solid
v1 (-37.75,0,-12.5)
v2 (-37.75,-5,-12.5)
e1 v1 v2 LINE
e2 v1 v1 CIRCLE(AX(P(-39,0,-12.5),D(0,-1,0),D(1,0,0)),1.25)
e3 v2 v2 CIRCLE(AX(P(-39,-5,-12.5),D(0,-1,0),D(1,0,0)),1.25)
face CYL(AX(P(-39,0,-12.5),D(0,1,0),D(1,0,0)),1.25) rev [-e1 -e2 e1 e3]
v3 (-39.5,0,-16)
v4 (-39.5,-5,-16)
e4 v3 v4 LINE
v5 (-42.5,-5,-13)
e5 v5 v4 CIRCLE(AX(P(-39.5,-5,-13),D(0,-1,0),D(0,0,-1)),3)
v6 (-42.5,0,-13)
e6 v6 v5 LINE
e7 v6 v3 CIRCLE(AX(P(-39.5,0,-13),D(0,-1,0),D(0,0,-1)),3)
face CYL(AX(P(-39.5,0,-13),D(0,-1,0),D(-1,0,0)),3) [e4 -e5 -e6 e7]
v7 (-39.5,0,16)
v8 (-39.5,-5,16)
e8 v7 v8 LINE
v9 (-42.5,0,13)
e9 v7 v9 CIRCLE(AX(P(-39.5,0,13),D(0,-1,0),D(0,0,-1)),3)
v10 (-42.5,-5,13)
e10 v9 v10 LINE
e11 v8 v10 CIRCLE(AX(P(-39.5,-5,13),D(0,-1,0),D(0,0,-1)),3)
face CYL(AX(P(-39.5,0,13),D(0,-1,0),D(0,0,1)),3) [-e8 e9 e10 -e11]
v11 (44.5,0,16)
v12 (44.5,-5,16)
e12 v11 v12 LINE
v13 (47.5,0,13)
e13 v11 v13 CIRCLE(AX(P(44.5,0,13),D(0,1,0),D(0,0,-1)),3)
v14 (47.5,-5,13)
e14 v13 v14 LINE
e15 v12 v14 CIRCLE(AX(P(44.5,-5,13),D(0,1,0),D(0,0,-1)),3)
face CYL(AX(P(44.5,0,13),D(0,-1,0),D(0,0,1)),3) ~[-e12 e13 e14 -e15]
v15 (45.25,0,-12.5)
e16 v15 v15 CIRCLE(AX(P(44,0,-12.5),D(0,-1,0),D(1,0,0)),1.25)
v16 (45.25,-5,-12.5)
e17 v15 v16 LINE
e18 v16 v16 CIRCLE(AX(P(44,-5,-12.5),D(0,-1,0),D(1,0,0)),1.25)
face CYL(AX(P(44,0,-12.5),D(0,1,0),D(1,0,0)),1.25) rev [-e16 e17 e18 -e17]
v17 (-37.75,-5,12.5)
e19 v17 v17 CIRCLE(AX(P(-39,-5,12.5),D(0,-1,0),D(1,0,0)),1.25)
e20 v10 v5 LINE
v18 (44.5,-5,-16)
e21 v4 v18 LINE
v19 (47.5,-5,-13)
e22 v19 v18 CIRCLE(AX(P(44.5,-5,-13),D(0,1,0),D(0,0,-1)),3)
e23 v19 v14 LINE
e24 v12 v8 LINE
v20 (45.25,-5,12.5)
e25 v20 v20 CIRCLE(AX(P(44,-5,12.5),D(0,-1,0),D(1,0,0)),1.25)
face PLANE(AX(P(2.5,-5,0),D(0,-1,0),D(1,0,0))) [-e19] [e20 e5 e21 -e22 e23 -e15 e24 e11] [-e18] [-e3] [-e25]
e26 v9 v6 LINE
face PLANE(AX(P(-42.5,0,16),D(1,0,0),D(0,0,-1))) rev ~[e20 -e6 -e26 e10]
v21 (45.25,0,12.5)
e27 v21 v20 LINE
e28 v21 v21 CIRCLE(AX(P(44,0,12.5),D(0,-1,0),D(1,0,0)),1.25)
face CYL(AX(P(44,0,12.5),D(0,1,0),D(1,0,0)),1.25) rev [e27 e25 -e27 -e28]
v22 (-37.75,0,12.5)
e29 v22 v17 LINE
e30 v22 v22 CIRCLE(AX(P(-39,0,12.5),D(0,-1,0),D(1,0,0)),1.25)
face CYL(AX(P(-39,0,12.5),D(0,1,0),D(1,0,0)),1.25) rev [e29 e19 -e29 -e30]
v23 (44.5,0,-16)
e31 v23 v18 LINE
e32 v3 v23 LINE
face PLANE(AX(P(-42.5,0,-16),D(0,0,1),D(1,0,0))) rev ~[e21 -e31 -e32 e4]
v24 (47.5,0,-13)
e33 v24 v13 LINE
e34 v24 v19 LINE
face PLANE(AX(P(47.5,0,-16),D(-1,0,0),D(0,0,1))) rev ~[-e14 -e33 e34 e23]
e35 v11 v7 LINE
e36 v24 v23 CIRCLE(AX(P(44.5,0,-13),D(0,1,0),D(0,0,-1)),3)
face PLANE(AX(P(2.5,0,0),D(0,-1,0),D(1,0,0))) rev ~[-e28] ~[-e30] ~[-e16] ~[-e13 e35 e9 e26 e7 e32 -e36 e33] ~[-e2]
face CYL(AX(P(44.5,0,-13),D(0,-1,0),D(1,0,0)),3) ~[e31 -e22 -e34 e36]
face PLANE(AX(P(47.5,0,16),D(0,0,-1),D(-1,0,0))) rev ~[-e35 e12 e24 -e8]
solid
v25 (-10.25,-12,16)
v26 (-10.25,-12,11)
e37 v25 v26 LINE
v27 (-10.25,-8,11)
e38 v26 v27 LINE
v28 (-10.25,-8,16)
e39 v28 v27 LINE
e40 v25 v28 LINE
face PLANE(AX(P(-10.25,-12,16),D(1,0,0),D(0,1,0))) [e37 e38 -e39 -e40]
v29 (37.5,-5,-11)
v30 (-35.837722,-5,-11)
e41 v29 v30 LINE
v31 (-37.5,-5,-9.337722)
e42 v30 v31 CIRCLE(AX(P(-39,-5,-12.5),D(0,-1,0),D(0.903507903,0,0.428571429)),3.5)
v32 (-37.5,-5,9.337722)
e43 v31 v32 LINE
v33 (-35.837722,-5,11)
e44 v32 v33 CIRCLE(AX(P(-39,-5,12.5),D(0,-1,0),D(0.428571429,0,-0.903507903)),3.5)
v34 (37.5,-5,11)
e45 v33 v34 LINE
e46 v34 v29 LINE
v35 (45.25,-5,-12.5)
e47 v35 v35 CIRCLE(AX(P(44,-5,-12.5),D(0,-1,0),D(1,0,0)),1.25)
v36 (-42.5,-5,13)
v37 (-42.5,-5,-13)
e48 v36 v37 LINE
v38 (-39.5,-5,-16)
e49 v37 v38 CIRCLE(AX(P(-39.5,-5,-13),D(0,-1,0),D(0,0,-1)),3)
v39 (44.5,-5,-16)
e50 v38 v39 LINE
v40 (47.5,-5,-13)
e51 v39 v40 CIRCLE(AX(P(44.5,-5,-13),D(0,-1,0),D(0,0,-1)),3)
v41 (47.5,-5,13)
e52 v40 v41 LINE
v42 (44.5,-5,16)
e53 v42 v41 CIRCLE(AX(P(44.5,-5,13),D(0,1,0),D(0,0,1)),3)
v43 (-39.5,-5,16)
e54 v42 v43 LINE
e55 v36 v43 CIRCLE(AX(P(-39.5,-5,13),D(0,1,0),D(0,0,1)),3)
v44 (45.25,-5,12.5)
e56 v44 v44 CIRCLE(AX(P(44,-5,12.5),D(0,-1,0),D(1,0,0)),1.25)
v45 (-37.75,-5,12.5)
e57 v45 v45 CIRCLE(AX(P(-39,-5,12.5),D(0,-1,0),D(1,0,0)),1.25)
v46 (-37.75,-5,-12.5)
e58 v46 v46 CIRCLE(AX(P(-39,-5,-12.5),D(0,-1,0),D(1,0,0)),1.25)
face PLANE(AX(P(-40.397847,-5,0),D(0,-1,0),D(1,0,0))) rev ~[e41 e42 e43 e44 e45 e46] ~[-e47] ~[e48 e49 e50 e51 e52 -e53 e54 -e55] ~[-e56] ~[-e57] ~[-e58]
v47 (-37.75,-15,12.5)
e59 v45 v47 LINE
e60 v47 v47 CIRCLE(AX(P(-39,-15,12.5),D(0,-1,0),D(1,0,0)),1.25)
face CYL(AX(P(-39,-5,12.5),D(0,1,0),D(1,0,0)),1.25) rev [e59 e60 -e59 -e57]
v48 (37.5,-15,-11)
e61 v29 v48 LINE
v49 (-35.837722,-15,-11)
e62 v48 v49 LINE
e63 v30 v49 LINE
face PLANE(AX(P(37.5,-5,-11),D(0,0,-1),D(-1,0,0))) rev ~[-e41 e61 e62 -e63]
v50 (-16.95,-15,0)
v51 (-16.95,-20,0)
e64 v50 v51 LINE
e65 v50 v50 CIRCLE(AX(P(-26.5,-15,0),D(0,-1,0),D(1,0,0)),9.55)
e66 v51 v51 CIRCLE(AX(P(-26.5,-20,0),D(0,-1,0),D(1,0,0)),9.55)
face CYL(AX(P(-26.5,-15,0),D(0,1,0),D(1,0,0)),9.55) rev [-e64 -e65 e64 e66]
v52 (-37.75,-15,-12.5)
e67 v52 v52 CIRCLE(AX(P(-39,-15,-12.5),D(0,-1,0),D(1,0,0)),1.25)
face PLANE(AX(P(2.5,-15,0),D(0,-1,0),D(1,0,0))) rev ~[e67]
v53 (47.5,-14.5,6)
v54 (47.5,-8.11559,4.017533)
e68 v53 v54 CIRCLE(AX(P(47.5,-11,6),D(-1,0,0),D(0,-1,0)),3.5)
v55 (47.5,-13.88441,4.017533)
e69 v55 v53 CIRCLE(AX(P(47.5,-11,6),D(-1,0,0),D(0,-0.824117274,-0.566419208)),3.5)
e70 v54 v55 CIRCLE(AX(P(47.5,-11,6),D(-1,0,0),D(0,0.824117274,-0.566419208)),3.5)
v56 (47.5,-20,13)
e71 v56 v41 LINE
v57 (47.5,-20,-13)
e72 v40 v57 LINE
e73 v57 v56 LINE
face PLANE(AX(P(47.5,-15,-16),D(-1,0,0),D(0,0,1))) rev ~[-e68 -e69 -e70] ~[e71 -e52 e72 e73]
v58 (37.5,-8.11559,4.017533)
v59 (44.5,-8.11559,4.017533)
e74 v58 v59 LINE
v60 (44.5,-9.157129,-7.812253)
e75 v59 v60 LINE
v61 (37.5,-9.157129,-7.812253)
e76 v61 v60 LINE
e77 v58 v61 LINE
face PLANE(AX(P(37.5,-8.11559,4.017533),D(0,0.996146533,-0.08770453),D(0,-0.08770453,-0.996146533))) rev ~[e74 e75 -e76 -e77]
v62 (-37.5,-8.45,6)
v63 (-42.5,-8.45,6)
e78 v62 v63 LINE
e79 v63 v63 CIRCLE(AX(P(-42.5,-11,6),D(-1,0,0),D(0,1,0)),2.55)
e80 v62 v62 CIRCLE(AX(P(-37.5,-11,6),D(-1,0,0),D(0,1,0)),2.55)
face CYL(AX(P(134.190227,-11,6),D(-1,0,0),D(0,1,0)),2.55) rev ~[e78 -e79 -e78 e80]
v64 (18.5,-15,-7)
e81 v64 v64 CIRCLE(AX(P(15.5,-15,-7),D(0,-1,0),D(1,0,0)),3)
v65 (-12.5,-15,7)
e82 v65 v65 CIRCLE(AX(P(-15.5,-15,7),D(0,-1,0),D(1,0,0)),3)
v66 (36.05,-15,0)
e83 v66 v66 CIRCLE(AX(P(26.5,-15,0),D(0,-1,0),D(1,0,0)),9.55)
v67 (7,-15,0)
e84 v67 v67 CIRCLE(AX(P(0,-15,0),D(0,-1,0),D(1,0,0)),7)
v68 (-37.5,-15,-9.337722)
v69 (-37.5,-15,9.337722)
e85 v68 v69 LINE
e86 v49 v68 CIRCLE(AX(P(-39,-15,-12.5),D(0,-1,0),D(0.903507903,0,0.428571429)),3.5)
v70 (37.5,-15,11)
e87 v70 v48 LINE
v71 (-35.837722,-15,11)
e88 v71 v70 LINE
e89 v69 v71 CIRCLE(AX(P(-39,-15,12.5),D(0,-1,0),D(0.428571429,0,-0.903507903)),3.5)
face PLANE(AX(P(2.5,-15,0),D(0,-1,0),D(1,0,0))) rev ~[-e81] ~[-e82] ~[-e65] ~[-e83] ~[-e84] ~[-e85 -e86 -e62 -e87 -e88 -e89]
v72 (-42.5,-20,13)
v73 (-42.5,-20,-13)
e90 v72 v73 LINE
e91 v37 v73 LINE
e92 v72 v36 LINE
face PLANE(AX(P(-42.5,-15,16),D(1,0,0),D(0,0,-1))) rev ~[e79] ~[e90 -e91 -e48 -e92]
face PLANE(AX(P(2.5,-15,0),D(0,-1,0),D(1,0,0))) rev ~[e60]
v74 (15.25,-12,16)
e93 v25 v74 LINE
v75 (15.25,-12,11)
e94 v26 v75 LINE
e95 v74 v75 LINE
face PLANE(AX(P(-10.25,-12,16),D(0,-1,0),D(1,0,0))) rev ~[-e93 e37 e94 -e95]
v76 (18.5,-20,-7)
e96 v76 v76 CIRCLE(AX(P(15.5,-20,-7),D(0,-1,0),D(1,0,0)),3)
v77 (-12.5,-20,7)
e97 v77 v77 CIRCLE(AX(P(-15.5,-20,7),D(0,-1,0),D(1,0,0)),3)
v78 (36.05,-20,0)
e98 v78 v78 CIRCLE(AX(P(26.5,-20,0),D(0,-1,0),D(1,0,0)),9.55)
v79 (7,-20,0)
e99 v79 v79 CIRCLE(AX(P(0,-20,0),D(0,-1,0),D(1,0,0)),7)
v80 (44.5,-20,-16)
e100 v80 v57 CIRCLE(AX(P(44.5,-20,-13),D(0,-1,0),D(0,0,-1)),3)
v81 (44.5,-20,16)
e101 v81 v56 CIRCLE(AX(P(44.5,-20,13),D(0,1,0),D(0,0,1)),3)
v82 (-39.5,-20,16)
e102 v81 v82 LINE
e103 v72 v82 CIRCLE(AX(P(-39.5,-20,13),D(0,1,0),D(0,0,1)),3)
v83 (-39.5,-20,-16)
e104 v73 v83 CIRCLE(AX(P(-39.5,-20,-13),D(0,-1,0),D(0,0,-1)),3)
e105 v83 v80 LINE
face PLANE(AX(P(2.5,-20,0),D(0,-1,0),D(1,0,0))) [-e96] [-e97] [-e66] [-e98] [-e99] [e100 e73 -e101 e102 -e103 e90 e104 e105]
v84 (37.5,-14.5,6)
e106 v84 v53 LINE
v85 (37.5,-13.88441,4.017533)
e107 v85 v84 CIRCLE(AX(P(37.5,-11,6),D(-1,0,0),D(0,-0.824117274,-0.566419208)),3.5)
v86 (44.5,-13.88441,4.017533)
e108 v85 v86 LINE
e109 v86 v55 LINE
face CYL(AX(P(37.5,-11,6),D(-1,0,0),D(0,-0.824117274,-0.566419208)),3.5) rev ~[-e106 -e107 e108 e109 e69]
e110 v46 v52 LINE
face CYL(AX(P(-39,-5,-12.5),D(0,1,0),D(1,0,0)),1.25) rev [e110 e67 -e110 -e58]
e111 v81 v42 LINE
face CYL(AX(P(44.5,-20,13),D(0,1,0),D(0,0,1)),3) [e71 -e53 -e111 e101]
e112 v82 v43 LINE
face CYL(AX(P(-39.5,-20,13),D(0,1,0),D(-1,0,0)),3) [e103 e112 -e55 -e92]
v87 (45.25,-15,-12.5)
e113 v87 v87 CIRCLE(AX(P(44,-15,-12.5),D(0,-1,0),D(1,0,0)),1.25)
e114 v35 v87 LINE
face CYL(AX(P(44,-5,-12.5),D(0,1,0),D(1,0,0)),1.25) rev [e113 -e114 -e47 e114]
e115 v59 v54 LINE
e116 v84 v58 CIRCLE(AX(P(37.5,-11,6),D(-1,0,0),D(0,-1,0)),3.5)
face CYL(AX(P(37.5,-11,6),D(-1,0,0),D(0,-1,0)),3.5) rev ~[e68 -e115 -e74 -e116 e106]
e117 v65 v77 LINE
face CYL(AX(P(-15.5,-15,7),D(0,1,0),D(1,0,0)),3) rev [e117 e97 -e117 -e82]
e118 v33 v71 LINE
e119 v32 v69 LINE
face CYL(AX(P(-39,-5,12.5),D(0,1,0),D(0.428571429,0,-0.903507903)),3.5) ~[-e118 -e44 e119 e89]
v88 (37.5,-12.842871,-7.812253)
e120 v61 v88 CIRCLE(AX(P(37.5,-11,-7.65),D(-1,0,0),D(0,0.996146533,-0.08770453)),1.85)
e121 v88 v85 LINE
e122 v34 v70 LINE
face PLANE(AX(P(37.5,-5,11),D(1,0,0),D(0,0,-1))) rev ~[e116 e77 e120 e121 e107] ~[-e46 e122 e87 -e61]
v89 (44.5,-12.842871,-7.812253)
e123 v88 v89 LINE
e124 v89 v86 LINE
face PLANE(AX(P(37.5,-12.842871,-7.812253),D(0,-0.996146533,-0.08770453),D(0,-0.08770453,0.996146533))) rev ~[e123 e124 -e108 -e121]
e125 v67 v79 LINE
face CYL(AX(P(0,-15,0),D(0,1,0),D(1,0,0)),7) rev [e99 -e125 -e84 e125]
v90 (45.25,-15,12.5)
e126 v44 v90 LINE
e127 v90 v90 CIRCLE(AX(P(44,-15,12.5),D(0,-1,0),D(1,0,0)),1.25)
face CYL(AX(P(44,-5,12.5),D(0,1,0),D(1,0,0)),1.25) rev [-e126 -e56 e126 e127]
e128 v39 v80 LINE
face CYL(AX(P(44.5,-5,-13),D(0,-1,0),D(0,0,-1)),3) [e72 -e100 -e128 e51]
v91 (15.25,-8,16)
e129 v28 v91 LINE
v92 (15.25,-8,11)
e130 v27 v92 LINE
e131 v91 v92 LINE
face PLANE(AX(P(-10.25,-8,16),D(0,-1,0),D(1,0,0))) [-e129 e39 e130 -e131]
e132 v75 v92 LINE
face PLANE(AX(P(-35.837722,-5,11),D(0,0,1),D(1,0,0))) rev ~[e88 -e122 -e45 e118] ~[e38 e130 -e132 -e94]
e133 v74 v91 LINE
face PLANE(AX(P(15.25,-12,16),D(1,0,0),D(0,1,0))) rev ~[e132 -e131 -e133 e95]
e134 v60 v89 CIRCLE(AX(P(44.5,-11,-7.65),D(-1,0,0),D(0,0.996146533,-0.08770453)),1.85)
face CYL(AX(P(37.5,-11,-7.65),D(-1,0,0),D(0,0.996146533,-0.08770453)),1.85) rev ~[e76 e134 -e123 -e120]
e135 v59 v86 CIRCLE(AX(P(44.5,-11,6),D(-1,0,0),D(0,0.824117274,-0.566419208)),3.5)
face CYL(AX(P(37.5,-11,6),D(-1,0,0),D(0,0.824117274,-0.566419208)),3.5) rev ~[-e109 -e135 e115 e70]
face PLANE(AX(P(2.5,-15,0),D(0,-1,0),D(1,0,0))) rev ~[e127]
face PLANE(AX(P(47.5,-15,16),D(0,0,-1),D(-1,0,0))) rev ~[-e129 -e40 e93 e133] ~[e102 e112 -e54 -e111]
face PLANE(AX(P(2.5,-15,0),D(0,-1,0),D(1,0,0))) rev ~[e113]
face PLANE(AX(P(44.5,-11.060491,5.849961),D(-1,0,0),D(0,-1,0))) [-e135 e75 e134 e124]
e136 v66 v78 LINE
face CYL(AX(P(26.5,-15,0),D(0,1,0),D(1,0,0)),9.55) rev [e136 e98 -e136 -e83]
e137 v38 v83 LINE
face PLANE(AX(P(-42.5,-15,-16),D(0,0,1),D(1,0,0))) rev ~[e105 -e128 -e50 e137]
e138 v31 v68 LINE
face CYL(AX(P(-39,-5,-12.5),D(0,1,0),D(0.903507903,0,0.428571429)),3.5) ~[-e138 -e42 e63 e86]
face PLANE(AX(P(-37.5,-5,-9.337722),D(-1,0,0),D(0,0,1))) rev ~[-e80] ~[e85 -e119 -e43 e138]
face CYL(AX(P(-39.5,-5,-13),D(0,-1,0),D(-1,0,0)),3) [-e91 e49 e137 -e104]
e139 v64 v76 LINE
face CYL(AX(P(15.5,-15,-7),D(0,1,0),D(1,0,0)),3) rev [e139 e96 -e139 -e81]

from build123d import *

# Parameters (mm, degrees)
F0_R      = 1.25
F1_DEPTH  = 5
F2_R      = 1.25
F3_DEPTH  = 10
F4_R      = 3
F4_R_2    = 9.55
F4_R_3    = 7
F5_DEPTH  = 5
F6_W      = 25.5
F6_H      = 4
F7_DEPTH  = 5
F8_R      = 3
F8_2_R    = 3
F10_DEPTH = 10
F11_DEPTH = 7
F12_D     = 5.1


# Not quite as in the source:
# - a feature names something its author has since deleted; it is built from what else it names


with BuildPart() as f1:
    # F0 (on Front) → F1 (new body)
    with BuildSketch(Plane.XZ):
        Polygon((47.5, 16), (42.5, 16), (-42.5, 16), (-42.5, -16), (42.5, -16), (47.5, -16), align=None)
        with Locations((-39, -12.5)):
            Circle(F0_R, mode=Mode.SUBTRACT)
        with Locations((44, -12.5)):
            Circle(F0_R, mode=Mode.SUBTRACT)
        with Locations((-39, 12.5)):
            Circle(F0_R, mode=Mode.SUBTRACT)
        with Locations((44, 12.5)):
            Circle(F0_R, mode=Mode.SUBTRACT)
    extrude(amount=F1_DEPTH)

    # F8#2
    f8_2_edges = [f1.edges().sort_by_distance(p)[0] for p in [
        (47.5, -2.5, 16),
        (47.5, -2.5, -16),
        (-42.5, -2.5, 16),
        (-42.5, -2.5, -16),
    ]]
    fillet(f8_2_edges, radius=F8_2_R)


with BuildPart() as f3:
    # F2 (on face) → F3 (new body)
    with BuildSketch(Plane.XZ.offset(5)):
        with BuildLine():
            ThreePointArc((-37.5, 9.3377223398), (-40.8708286934, 9.5419601085), (-42.5, 12.5))
            Line((-42.5, 12.5), (-42.5, -12.5))
            ThreePointArc((-42.5, -12.5), (-40.8708286934, -9.5419601085), (-37.5, -9.3377223398))
            Line((-37.5, -9.3377223398), (-37.5, 9.3377223398))
        make_face()
        with BuildLine():
            ThreePointArc((-35.5, 12.5), (-36.5251262658, 14.9748737342), (-39, 16))
            ThreePointArc((-39, 16), (-41.4748737342, 14.9748737342), (-42.5, 12.5))
            ThreePointArc((-42.5, 12.5), (-40.8708286934, 9.5419601085), (-37.5, 9.3377223398))
            Line((-37.5, 9.3377223398), (-37.5, 11))
            Line((-37.5, 11), (-35.8377223398, 11))
            ThreePointArc((-35.8377223398, 11), (-35.5854742781, 11.7312255892), (-35.5, 12.5))
        make_face()
        with Locations((-39, 12.5)):
            Circle(F2_R, mode=Mode.SUBTRACT)
        with BuildLine():
            Line((-39, 16), (-42.5, 16))
            Line((-42.5, 16), (-42.5, 12.5))
            ThreePointArc((-42.5, 12.5), (-41.4748737342, 14.9748737342), (-39, 16))
        make_face()
        with BuildLine():
            ThreePointArc((-39, -16), (-41.4748737342, -14.9748737342), (-42.5, -12.5))
            Line((-42.5, -12.5), (-42.5, -16))
            Line((-42.5, -16), (-39, -16))
        make_face()
        with BuildLine():
            ThreePointArc((-37.5, -9.3377223398), (-40.8708286934, -9.5419601085), (-42.5, -12.5))
            ThreePointArc((-42.5, -12.5), (-41.4748737342, -14.9748737342), (-39, -16))
            ThreePointArc((-39, -16), (-36.5251262658, -14.9748737342), (-35.5, -12.5))
            ThreePointArc((-35.5, -12.5), (-35.5854742781, -11.7312255892), (-35.8377223398, -11))
            Line((-35.8377223398, -11), (-37.5, -11))
            Line((-37.5, -11), (-37.5, -9.3377223398))
        make_face()
        with Locations((-39, -12.5)):
            Circle(F2_R, mode=Mode.SUBTRACT)
        with BuildLine():
            Line((42.5, 16), (-39, 16))
            ThreePointArc((-39, 16), (-36.5251262658, 14.9748737342), (-35.5, 12.5))
            ThreePointArc((-35.5, 12.5), (-35.5854742781, 11.7312255892), (-35.8377223398, 11))
            Line((-35.8377223398, 11), (37.5, 11))
            Line((37.5, 11), (37.5, -11))
            Line((37.5, -11), (-35.8377223398, -11))
            ThreePointArc((-35.8377223398, -11), (-35.5854742781, -11.7312255892), (-35.5, -12.5))
            ThreePointArc((-35.5, -12.5), (-36.5251262658, -14.9748737342), (-39, -16))
            Line((-39, -16), (42.5, -16))
            Line((42.5, -16), (47.5, -16))
            Line((47.5, -16), (47.5, 16))
            Line((47.5, 16), (42.5, 16))
        make_face()
        with Locations((44, -12.5)):
            Circle(F2_R, mode=Mode.SUBTRACT)
        with Locations((44, 12.5)):
            Circle(F2_R, mode=Mode.SUBTRACT)
        with BuildLine():
            Line((-37.5, 11), (-37.5, 9.3377223398))
            ThreePointArc((-37.5, 9.3377223398), (-36.5251262658, 10.0251262658), (-35.8377223398, 11))
            Line((-35.8377223398, 11), (-37.5, 11))
        make_face()
        with BuildLine():
            ThreePointArc((-35.8377223398, -11), (-36.5251262658, -10.0251262658), (-37.5, -9.3377223398))
            Line((-37.5, -9.3377223398), (-37.5, -11))
            Line((-37.5, -11), (-35.8377223398, -11))
        make_face()
    extrude(amount=F3_DEPTH)

    # F4 (on face) → F5 (join)
    with BuildSketch(Plane.XZ.offset(15)):
        Polygon((42.5, 16), (-42.5, 16), (-42.5, -16), (42.5, -16), (47.5, -16), (47.5, 16), align=None)
        with Locations((15.5, -7)):
            Circle(F4_R, mode=Mode.SUBTRACT)
        with Locations((-26.5, 0)):
            Circle(F4_R_2, mode=Mode.SUBTRACT)
        Circle(F4_R_3, mode=Mode.SUBTRACT)
        with Locations((-15.5, 7)):
            Circle(F4_R, mode=Mode.SUBTRACT)
        with Locations((26.5, 0)):
            Circle(F4_R_2, mode=Mode.SUBTRACT)
    extrude(amount=F5_DEPTH)

    # F6 (on face) → F7 (cut)
    with BuildSketch(Plane.XY.offset(16)):
        with Locations((2.5, -10)):
            Rectangle(F6_W, F6_H)
    extrude(amount=-F7_DEPTH, mode=Mode.SUBTRACT)

    # F8
    f8_edges = [f3.edges().sort_by_distance(p)[0] for p in [
        (47.5, -12.5, 16),
        (47.5, -12.5, -16),
        (-42.5, -12.5, 16),
        (-42.5, -12.5, -16),
    ]]
    fillet(f8_edges, radius=F8_R)

    # F9 (on face) → F10 (cut, through all)
    with BuildSketch(Plane(origin=(37.5, 0, 0), x_dir=(0, -1, 0), z_dir=(-1, 0, 0))):
        with BuildLine():
            ThreePointArc((13.8844104576, 4.0175327715), (14.3425616376, 4.9620781825), (14.5, 6))
            ThreePointArc((14.5, 6), (9.9620781825, 9.3425616376), (8.1155895424, 4.0175327715))
            ThreePointArc((8.1155895424, 4.0175327715), (11, 2.5), (13.8844104576, 4.0175327715))
        make_face()
    extrude(amount=-F10_DEPTH, mode=Mode.SUBTRACT)

    # F9 (on face) → F11 (cut)
    with BuildSketch(Plane(origin=(37.5, 0, 0), x_dir=(0, -1, 0), z_dir=(-1, 0, 0))):
        with BuildLine():
            ThreePointArc((13.8844104576, 4.0175327715), (14.3425616376, 4.9620781825), (14.5, 6))
            ThreePointArc((14.5, 6), (9.9620781825, 9.3425616376), (8.1155895424, 4.0175327715))
            ThreePointArc((8.1155895424, 4.0175327715), (11, 2.5), (13.8844104576, 4.0175327715))
        make_face()
        with BuildLine():
            ThreePointArc((13.8844104576, 4.0175327715), (11, 2.5), (8.1155895424, 4.0175327715))
            Line((8.1155895424, 4.0175327715), (9.1571289137, -7.8122533804))
            ThreePointArc((9.1571289137, -7.8122533804), (10.9187950419, -5.8017830877), (12.85, -7.65))
            ThreePointArc((12.85, -7.65), (12.8482169123, -7.7312049581), (12.8428710863, -7.8122533804))
            Line((12.8428710863, -7.8122533804), (13.8844104576, 4.0175327715))
        make_face()
        with BuildLine():
            Line((12.8428710863, -7.8122533804), (9.1571289137, -7.8122533804))
            ThreePointArc((9.1571289137, -7.8122533804), (11, -9.5), (12.8428710863, -7.8122533804))
        make_face()
        with BuildLine():
            ThreePointArc((12.85, -7.65), (10.9187950419, -5.8017830877), (9.1571289137, -7.8122533804))
            Line((9.1571289137, -7.8122533804), (12.8428710863, -7.8122533804))
            ThreePointArc((12.8428710863, -7.8122533804), (12.8482169123, -7.7312049581), (12.85, -7.65))
        make_face()
    extrude(amount=-F11_DEPTH, mode=Mode.SUBTRACT)

    # F12 (through all)
    with Locations(Plane(origin=(37.5, 0, 0), x_dir=(0, -1, 0), z_dir=(1, 0, 0))):
        with Locations((11, -6)):
            Hole(F12_D / 2)


solid = Compound([f1.part, f3.part])
